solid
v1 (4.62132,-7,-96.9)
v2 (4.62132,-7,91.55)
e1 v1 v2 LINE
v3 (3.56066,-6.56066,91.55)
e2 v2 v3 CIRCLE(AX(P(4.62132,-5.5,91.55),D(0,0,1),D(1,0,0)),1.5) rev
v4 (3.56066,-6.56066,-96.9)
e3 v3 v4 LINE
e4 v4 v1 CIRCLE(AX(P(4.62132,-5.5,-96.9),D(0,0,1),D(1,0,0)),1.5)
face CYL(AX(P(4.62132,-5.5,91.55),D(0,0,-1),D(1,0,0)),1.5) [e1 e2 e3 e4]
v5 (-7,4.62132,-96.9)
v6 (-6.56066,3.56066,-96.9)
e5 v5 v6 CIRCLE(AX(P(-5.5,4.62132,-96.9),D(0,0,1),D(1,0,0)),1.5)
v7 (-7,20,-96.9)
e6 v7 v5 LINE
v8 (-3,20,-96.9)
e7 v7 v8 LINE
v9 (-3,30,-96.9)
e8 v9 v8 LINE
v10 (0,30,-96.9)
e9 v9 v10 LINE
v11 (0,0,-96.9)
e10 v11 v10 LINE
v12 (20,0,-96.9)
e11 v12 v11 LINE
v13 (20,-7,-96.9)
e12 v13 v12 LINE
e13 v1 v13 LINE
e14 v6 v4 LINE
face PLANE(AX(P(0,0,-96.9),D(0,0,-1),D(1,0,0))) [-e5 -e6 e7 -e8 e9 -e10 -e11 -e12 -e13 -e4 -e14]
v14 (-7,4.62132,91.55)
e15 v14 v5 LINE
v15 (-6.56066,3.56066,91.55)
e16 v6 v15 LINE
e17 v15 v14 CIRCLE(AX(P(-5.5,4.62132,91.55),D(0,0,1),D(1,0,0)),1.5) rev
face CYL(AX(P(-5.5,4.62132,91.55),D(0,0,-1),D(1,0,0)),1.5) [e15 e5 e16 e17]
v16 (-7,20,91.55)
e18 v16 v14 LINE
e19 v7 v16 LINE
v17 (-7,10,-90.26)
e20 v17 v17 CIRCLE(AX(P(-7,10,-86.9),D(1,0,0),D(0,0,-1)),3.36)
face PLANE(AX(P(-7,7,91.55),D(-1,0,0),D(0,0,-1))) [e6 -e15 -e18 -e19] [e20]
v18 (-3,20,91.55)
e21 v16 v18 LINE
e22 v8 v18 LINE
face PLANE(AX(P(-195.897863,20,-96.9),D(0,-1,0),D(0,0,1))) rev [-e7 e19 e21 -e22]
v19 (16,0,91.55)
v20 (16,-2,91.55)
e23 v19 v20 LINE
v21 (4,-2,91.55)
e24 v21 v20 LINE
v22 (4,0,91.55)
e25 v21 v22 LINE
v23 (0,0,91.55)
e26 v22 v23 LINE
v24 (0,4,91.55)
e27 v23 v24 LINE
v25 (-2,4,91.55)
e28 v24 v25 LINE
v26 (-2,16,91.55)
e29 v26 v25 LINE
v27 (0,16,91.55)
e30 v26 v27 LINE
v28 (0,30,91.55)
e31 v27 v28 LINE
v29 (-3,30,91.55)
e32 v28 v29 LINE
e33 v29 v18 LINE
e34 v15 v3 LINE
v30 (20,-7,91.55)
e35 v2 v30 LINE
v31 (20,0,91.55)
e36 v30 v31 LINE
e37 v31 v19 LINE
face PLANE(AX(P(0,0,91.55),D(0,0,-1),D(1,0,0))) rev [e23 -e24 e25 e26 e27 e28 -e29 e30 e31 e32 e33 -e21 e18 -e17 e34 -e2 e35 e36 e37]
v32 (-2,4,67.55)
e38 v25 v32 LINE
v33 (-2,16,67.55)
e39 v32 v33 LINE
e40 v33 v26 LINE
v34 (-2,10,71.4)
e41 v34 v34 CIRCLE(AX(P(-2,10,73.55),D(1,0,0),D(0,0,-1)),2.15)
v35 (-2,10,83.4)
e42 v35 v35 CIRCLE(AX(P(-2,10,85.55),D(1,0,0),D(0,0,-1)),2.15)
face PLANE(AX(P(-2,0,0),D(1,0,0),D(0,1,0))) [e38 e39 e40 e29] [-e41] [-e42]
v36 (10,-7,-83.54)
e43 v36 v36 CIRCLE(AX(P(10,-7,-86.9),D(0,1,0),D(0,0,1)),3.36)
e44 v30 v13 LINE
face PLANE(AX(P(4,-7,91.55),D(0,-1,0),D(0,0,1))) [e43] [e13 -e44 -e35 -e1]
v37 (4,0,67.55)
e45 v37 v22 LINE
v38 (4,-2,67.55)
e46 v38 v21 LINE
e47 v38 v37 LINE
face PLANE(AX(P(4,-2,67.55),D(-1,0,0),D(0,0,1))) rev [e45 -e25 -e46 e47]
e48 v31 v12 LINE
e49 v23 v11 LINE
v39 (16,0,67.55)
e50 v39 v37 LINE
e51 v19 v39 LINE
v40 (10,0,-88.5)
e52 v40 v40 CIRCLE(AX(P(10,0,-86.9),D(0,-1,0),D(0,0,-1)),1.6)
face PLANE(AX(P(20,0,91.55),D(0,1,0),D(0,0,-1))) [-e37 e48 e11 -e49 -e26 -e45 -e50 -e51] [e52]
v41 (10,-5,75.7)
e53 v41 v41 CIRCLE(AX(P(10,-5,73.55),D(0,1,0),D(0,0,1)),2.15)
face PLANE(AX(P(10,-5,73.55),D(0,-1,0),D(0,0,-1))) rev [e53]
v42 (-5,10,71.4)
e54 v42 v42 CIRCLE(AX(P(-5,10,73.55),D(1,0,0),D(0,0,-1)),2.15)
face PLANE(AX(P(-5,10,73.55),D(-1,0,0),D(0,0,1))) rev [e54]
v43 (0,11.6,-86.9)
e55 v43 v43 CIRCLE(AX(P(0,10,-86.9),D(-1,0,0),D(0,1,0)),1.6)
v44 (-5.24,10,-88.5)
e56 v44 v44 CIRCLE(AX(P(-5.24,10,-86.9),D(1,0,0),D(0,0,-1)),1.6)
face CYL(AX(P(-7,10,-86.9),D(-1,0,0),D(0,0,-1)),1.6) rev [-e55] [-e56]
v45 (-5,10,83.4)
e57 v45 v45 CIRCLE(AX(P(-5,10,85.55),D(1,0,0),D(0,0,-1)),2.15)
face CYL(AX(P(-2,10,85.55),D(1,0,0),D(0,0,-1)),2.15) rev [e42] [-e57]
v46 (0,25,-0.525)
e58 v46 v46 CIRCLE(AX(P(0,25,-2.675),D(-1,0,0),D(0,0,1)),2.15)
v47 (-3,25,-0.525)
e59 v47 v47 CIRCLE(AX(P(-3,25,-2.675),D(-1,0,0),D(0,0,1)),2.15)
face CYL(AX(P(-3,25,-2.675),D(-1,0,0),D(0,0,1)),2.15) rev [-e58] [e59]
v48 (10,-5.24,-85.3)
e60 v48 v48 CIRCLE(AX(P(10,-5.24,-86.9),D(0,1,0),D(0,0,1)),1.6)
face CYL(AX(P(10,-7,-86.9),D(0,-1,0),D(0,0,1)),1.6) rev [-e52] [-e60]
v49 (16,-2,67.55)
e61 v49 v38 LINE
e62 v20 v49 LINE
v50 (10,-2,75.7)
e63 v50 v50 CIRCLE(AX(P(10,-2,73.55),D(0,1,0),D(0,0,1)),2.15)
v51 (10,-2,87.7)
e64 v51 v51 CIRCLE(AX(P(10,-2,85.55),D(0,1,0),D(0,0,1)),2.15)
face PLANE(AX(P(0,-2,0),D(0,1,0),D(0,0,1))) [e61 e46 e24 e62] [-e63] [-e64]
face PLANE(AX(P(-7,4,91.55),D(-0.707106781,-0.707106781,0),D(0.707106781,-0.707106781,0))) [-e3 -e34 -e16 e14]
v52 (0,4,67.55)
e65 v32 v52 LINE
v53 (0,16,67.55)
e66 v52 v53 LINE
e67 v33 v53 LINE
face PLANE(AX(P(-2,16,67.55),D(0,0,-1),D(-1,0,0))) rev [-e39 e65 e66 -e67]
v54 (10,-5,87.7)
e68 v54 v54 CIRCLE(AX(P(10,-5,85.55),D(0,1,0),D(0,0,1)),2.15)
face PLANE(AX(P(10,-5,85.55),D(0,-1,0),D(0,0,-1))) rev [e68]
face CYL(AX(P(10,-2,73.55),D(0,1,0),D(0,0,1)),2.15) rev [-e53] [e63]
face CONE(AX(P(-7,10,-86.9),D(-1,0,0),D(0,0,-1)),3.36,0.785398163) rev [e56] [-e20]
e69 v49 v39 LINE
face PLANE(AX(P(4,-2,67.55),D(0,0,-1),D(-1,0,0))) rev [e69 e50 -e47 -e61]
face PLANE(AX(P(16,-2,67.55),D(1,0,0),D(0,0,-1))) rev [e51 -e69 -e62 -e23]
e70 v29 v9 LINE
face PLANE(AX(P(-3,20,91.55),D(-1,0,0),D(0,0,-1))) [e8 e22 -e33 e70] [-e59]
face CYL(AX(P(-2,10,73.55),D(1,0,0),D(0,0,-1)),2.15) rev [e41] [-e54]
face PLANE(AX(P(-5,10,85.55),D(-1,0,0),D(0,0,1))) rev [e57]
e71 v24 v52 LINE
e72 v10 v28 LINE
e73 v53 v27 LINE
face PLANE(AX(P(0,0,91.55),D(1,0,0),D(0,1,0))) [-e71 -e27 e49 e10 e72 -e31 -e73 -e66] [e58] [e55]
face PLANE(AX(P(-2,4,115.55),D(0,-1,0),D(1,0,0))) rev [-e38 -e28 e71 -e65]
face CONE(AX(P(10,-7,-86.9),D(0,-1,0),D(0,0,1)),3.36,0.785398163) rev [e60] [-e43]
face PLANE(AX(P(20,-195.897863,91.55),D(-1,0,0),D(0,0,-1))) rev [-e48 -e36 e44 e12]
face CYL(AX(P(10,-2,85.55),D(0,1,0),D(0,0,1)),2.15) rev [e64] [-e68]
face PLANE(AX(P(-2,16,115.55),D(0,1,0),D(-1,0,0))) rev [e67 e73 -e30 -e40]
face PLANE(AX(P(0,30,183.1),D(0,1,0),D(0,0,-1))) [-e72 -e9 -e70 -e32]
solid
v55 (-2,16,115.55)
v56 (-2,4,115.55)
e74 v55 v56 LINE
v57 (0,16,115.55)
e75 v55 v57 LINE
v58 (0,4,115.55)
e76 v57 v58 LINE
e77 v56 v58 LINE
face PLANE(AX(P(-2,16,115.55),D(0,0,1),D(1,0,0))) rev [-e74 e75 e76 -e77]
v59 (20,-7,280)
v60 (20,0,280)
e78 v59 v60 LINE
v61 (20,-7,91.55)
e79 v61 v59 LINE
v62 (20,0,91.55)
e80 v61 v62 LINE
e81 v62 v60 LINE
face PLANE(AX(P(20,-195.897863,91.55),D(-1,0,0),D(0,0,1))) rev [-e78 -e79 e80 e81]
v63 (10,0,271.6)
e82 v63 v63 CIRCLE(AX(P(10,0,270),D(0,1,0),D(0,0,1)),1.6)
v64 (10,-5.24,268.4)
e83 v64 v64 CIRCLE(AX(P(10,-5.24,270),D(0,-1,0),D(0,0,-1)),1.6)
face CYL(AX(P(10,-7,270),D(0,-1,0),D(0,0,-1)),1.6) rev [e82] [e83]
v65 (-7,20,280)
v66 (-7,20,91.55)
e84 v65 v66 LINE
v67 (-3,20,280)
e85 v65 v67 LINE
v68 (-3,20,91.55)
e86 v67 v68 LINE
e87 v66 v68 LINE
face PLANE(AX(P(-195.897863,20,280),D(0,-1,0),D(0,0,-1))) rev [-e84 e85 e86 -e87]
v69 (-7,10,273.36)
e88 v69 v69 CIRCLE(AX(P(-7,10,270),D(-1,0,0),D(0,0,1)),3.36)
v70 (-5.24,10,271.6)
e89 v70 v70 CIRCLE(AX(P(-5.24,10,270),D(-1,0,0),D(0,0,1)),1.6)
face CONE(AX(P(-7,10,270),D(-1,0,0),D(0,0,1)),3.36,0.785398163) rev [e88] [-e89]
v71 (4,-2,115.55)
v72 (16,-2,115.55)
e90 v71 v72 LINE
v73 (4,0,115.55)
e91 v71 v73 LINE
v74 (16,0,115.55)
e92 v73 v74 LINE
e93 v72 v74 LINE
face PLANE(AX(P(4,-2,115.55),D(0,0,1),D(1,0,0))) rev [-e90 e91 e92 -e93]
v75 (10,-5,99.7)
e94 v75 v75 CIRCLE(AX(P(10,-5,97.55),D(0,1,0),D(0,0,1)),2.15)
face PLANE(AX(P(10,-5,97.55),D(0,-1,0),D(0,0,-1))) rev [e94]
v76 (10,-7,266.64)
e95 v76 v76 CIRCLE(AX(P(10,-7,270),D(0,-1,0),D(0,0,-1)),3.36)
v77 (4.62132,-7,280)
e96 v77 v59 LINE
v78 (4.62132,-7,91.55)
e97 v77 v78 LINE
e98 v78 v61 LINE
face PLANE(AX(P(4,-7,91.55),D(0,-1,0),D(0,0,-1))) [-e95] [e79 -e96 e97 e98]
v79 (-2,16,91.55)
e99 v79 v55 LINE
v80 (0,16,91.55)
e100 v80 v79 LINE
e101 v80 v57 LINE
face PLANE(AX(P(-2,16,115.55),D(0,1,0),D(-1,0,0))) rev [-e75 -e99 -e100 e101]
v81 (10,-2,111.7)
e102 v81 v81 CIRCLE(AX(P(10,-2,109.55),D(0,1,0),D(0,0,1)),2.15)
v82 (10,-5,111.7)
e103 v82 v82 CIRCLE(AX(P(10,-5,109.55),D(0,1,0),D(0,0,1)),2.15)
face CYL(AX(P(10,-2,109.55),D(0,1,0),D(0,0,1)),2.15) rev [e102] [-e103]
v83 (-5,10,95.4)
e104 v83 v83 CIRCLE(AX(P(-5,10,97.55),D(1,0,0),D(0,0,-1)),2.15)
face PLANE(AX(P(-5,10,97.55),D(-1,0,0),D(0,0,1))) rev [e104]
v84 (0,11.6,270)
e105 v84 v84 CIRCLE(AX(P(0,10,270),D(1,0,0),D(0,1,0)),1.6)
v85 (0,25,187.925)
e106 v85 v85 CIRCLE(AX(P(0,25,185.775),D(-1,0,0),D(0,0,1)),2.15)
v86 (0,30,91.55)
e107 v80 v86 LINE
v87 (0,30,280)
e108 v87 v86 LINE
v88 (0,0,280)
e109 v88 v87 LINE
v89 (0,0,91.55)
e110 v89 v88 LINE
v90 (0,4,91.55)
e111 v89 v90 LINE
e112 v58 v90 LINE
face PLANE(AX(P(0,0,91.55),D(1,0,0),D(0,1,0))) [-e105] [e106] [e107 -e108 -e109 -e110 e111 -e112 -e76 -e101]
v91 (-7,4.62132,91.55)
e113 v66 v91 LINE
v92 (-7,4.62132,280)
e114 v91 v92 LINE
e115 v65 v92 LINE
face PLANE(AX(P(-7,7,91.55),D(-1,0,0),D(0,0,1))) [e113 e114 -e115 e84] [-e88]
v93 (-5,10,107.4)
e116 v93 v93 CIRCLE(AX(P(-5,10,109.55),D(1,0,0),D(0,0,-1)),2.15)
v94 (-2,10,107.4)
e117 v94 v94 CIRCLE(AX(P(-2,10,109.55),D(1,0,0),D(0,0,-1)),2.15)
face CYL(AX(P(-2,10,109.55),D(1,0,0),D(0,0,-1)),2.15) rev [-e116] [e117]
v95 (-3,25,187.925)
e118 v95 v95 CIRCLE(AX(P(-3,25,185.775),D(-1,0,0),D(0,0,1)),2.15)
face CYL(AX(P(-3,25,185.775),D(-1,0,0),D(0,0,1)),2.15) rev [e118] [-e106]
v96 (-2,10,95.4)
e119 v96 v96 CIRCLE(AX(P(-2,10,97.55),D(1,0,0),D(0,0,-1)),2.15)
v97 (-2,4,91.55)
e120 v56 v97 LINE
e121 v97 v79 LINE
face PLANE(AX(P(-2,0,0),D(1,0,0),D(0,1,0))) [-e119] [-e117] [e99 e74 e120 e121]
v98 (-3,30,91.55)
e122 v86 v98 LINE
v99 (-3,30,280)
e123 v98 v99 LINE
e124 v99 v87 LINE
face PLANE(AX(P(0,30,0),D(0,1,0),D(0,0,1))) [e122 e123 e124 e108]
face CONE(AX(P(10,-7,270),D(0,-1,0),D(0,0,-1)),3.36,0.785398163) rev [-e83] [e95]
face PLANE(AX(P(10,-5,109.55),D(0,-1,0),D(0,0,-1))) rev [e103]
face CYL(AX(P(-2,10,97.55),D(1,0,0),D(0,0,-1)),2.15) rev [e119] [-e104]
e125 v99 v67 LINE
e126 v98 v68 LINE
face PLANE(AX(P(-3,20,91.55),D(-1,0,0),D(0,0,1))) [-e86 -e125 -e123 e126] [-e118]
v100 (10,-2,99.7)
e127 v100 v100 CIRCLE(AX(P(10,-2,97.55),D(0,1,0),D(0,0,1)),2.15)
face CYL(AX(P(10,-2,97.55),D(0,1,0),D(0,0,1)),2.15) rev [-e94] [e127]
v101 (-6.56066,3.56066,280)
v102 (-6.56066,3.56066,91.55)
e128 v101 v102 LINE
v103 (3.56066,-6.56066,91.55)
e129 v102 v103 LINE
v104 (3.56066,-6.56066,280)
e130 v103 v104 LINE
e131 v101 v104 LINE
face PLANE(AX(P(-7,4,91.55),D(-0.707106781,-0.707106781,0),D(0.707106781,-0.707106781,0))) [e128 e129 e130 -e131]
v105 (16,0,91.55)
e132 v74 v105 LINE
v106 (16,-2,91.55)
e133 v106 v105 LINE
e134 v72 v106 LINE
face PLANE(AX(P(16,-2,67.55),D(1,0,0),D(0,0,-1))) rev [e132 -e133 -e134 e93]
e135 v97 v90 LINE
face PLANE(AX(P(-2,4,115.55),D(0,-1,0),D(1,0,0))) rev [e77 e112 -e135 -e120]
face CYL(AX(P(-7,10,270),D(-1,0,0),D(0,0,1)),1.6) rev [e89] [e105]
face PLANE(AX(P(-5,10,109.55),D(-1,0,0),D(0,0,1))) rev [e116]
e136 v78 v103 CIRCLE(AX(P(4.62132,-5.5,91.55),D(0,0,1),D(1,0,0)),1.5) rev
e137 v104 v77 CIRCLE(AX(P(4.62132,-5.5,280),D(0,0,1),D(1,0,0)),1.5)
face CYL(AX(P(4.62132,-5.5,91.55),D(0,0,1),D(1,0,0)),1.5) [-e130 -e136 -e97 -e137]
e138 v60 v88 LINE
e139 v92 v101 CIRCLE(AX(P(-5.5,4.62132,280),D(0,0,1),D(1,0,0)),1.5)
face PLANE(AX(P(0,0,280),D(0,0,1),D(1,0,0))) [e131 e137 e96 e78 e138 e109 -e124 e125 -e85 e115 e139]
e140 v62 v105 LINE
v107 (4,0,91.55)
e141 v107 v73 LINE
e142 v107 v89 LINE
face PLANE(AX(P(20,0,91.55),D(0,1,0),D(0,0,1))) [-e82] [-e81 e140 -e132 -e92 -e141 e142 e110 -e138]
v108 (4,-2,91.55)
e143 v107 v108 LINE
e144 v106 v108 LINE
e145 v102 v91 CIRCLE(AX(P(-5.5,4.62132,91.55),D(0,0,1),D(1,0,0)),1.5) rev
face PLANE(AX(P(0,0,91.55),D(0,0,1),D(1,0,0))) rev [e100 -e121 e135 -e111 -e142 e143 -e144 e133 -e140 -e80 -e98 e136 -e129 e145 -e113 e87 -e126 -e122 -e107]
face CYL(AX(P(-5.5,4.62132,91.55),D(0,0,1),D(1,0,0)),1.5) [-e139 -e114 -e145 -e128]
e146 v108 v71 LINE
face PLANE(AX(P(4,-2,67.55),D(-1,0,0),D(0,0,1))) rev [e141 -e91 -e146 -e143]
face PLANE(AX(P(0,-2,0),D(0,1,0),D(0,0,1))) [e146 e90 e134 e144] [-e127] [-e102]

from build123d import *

# Parameters (mm, degrees)
BOSS_EXTRUDE1_DEPTH                = 188.45
FILLET1_R                          = 1.5
SKETCH6_W                          = 188.45
SKETCH6_H                          = 3
BOSS_EXTRUDE2_DEPTH                = 10
SKETCH7_W                          = 13
SKETCH7_H                          = 188.45
BOSS_EXTRUDE3_DEPTH                = 4
SKETCH8_W                          = 3
SKETCH8_H                          = 188.45
BOSS_EXTRUDE4_DEPTH                = 10
SKETCH9_W                          = 188.45
SKETCH9_H                          = 13
BOSS_EXTRUDE5_DEPTH                = 4
CSK_FOR_M3_SFHCS1_D                = 3.2
CSK_FOR_M3_SFHCS1_CSINK_D          = 6.72
CSK_FOR_M3_SFHCS1_CSINK_ANGLE      = 90
CSK_FOR_M3_SFHCS2_D                = 3.2
CSK_FOR_M3_SFHCS2_CSINK_D          = 6.72
CSK_FOR_M3_SFHCS2_CSINK_ANGLE      = 90
SKETCH14_W                         = 10
SKETCH14_H                         = 188.45
CUT_EXTRUDE1_DEPTH                 = 10
F_4_3_START                        = -3
F_4_3_4_3_DIAMETER_HOLE3_OUTLINE_R = 2.15
F_4_3_4_3_DIAMETER_HOLE3_DEPTH     = 3
SKETCH17_W                         = 12
SKETCH17_H                         = 48
CUT_EXTRUDE2_DEPTH                 = 2
SKETCH18_W                         = 48
SKETCH18_H                         = 12
CUT_EXTRUDE3_DEPTH                 = 2
F_4_3_START_2                      = -5
F_4_3_4_3_DIAMETER_HOLE1_OUTLINE_R = 2.15
F_4_3_4_3_DIAMETER_HOLE1_DEPTH     = 3
F_4_3_4_3_DIAMETER_HOLE2_OUTLINE_R = 2.15
F_4_3_4_3_DIAMETER_HOLE2_DEPTH     = 3


# Read off the part's stored shape, not the designer's step: Ø4.3 (4.3) Diameter Hole3, Ø4.3 (4.3) Diameter Hole1, Ø4.3 (4.3) Diameter Hole2
with BuildPart() as part:
    # Sketch1 → Boss-Extrude1 (new body)
    with BuildSketch(Plane.XY.offset(280)):
        Polygon((-7, 4), (4, -7), (7, -7), (7, -3), (20, -3), (20, 0), (0, 0), (0, 20), (-3, 20), (-3, 7), (-7, 7), align=None)
    extrude(amount=-BOSS_EXTRUDE1_DEPTH)

    # Fillet1
    fillet1_edges = [part.edges().sort_by_distance(p)[0] for p in [
        (4, -7, 185.775),
        (-7, 4, 185.775),
    ]]
    fillet(fillet1_edges, radius=FILLET1_R)

    # Sketch6 → Boss-Extrude2 (add)
    with BuildSketch(Plane(origin=(20, 0, 0), x_dir=(0, 0, -1), z_dir=(1, 0, 0))):
        with Locations((-185.775, -1.5)):
            Rectangle(SKETCH6_W, SKETCH6_H)
    extrude(amount=BOSS_EXTRUDE2_DEPTH)

    # Sketch7 → Boss-Extrude3 (add)
    with BuildSketch(Plane.XZ.offset(3)):
        with Locations((13.5, 185.775)):
            Rectangle(SKETCH7_W, SKETCH7_H)
    extrude(amount=BOSS_EXTRUDE3_DEPTH)

    # Sketch8 → Boss-Extrude4 (add)
    with BuildSketch(Plane(origin=(0, 20, 0), x_dir=(1, 0, 0), z_dir=(0, 1, 0))):
        with Locations((-1.5, -185.775)):
            Rectangle(SKETCH8_W, SKETCH8_H)
    extrude(amount=BOSS_EXTRUDE4_DEPTH)

    # Sketch9 → Boss-Extrude5 (add)
    with BuildSketch(Plane.ZY.offset(3)):
        with Locations((185.775, 13.5)):
            Rectangle(SKETCH9_W, SKETCH9_H)
    extrude(amount=BOSS_EXTRUDE5_DEPTH)

    # CSK for M3 SFHCS1 (through all)
    with Locations(Plane.XZ.offset(7)):
        with Locations((10, 270)):
            CounterSinkHole(CSK_FOR_M3_SFHCS1_D / 2, CSK_FOR_M3_SFHCS1_CSINK_D / 2, counter_sink_angle=CSK_FOR_M3_SFHCS1_CSINK_ANGLE)

    # CSK for M3 SFHCS2 (through all)
    with Locations(Plane.ZY.offset(7)):
        with Locations((270, 10)):
            CounterSinkHole(CSK_FOR_M3_SFHCS2_D / 2, CSK_FOR_M3_SFHCS2_CSINK_D / 2, counter_sink_angle=CSK_FOR_M3_SFHCS2_CSINK_ANGLE)

    # Sketch14 → Cut-Extrude1 (cut)
    with BuildSketch(Plane.XZ.offset(3)):
        with Locations((25, 185.775)):
            Rectangle(SKETCH14_W, SKETCH14_H)
    extrude(amount=-CUT_EXTRUDE1_DEPTH, mode=Mode.SUBTRACT)


with BuildPart() as body_2:
    # Mirror1: mirrored copy
    add(part.part.mirror(Plane.XY.offset(91.55)))


with BuildPart() as f_4_3_4_3_diameter_hole3_tool:
    # Ø4.3 (4.3) Diameter Hole3 outline → Ø4.3 (4.3) Diameter Hole3 (new body)
    with BuildSketch(Plane.YZ.offset(F_4_3_START)):
        with Locations((25, -2.675)):
            Circle(F_4_3_4_3_DIAMETER_HOLE3_OUTLINE_R)
        with Locations((25, 185.775)):
            Circle(F_4_3_4_3_DIAMETER_HOLE3_OUTLINE_R)
    extrude(amount=F_4_3_4_3_DIAMETER_HOLE3_DEPTH)


with BuildPart() as part_1:
    add(part.part)

    # Ø4.3 (4.3) Diameter Hole3: cut by f_4_3_4_3_diameter_hole3_tool
    add(f_4_3_4_3_diameter_hole3_tool.part, mode=Mode.SUBTRACT)


with BuildPart() as body_2_1:
    add(body_2.part)

    # Ø4.3 (4.3) Diameter Hole3: cut by f_4_3_4_3_diameter_hole3_tool
    add(f_4_3_4_3_diameter_hole3_tool.part, mode=Mode.SUBTRACT)


with BuildPart() as cut_extrude2_tool:
    # Sketch17 → Cut-Extrude2 (new body)
    with BuildSketch(Plane(origin=(0, 0, 0), x_dir=(1, 0, 0), z_dir=(0, 1, 0))):
        with Locations((10, -91.55)):
            Rectangle(SKETCH17_W, SKETCH17_H)
    extrude(amount=-CUT_EXTRUDE2_DEPTH)


with BuildPart() as part_2:
    add(part_1.part)

    # Cut-Extrude2: cut by cut_extrude2_tool
    add(cut_extrude2_tool.part, mode=Mode.SUBTRACT)


with BuildPart() as body_2_2:
    add(body_2_1.part)

    # Cut-Extrude2: cut by cut_extrude2_tool
    add(cut_extrude2_tool.part, mode=Mode.SUBTRACT)


with BuildPart() as cut_extrude3_tool:
    # Sketch18 → Cut-Extrude3 (new body)
    with BuildSketch(Plane(origin=(0, 0, 0), x_dir=(0, 0, -1), z_dir=(1, 0, 0))):
        with Locations((-91.55, 10)):
            Rectangle(SKETCH18_W, SKETCH18_H)
    extrude(amount=-CUT_EXTRUDE3_DEPTH)


with BuildPart() as part_3:
    add(part_2.part)

    # Cut-Extrude3: cut by cut_extrude3_tool
    add(cut_extrude3_tool.part, mode=Mode.SUBTRACT)


with BuildPart() as body_2_3:
    add(body_2_2.part)

    # Cut-Extrude3: cut by cut_extrude3_tool
    add(cut_extrude3_tool.part, mode=Mode.SUBTRACT)


with BuildPart() as f_4_3_4_3_diameter_hole1_tool:
    # Ø4.3 (4.3) Diameter Hole1 outline → Ø4.3 (4.3) Diameter Hole1 (new body)
    with BuildSketch(Plane(origin=(0, 0, 0), x_dir=(1, 0, 0), z_dir=(0, 1, 0)).offset(F_4_3_START_2)):
        with Locations((10, -73.55)):
            Circle(F_4_3_4_3_DIAMETER_HOLE1_OUTLINE_R)
        with Locations((10, -85.55)):
            Circle(F_4_3_4_3_DIAMETER_HOLE1_OUTLINE_R)
        with Locations((10, -109.55)):
            Circle(F_4_3_4_3_DIAMETER_HOLE1_OUTLINE_R)
        with Locations((10, -97.55)):
            Circle(F_4_3_4_3_DIAMETER_HOLE1_OUTLINE_R)
    extrude(amount=F_4_3_4_3_DIAMETER_HOLE1_DEPTH)


with BuildPart() as part_4:
    add(part_3.part)

    # Ø4.3 (4.3) Diameter Hole1: cut by f_4_3_4_3_diameter_hole1_tool
    add(f_4_3_4_3_diameter_hole1_tool.part, mode=Mode.SUBTRACT)


with BuildPart() as body_2_4:
    add(body_2_3.part)

    # Ø4.3 (4.3) Diameter Hole1: cut by f_4_3_4_3_diameter_hole1_tool
    add(f_4_3_4_3_diameter_hole1_tool.part, mode=Mode.SUBTRACT)


with BuildPart() as f_4_3_4_3_diameter_hole2_tool:
    # Ø4.3 (4.3) Diameter Hole2 outline → Ø4.3 (4.3) Diameter Hole2 (new body)
    with BuildSketch(Plane.YZ.offset(F_4_3_START_2)):
        with Locations((10, 73.55)):
            Circle(F_4_3_4_3_DIAMETER_HOLE2_OUTLINE_R)
        with Locations((10, 85.55)):
            Circle(F_4_3_4_3_DIAMETER_HOLE2_OUTLINE_R)
        with Locations((10, 97.55)):
            Circle(F_4_3_4_3_DIAMETER_HOLE2_OUTLINE_R)
        with Locations((10, 109.55)):
            Circle(F_4_3_4_3_DIAMETER_HOLE2_OUTLINE_R)
    extrude(amount=F_4_3_4_3_DIAMETER_HOLE2_DEPTH)


with BuildPart() as part_5:
    add(part_4.part)

    # Ø4.3 (4.3) Diameter Hole2: cut by f_4_3_4_3_diameter_hole2_tool
    add(f_4_3_4_3_diameter_hole2_tool.part, mode=Mode.SUBTRACT)


with BuildPart() as body_2_5:
    add(body_2_4.part)

    # Ø4.3 (4.3) Diameter Hole2: cut by f_4_3_4_3_diameter_hole2_tool
    add(f_4_3_4_3_diameter_hole2_tool.part, mode=Mode.SUBTRACT)


solid = Compound([part_5.part, body_2_5.part])
